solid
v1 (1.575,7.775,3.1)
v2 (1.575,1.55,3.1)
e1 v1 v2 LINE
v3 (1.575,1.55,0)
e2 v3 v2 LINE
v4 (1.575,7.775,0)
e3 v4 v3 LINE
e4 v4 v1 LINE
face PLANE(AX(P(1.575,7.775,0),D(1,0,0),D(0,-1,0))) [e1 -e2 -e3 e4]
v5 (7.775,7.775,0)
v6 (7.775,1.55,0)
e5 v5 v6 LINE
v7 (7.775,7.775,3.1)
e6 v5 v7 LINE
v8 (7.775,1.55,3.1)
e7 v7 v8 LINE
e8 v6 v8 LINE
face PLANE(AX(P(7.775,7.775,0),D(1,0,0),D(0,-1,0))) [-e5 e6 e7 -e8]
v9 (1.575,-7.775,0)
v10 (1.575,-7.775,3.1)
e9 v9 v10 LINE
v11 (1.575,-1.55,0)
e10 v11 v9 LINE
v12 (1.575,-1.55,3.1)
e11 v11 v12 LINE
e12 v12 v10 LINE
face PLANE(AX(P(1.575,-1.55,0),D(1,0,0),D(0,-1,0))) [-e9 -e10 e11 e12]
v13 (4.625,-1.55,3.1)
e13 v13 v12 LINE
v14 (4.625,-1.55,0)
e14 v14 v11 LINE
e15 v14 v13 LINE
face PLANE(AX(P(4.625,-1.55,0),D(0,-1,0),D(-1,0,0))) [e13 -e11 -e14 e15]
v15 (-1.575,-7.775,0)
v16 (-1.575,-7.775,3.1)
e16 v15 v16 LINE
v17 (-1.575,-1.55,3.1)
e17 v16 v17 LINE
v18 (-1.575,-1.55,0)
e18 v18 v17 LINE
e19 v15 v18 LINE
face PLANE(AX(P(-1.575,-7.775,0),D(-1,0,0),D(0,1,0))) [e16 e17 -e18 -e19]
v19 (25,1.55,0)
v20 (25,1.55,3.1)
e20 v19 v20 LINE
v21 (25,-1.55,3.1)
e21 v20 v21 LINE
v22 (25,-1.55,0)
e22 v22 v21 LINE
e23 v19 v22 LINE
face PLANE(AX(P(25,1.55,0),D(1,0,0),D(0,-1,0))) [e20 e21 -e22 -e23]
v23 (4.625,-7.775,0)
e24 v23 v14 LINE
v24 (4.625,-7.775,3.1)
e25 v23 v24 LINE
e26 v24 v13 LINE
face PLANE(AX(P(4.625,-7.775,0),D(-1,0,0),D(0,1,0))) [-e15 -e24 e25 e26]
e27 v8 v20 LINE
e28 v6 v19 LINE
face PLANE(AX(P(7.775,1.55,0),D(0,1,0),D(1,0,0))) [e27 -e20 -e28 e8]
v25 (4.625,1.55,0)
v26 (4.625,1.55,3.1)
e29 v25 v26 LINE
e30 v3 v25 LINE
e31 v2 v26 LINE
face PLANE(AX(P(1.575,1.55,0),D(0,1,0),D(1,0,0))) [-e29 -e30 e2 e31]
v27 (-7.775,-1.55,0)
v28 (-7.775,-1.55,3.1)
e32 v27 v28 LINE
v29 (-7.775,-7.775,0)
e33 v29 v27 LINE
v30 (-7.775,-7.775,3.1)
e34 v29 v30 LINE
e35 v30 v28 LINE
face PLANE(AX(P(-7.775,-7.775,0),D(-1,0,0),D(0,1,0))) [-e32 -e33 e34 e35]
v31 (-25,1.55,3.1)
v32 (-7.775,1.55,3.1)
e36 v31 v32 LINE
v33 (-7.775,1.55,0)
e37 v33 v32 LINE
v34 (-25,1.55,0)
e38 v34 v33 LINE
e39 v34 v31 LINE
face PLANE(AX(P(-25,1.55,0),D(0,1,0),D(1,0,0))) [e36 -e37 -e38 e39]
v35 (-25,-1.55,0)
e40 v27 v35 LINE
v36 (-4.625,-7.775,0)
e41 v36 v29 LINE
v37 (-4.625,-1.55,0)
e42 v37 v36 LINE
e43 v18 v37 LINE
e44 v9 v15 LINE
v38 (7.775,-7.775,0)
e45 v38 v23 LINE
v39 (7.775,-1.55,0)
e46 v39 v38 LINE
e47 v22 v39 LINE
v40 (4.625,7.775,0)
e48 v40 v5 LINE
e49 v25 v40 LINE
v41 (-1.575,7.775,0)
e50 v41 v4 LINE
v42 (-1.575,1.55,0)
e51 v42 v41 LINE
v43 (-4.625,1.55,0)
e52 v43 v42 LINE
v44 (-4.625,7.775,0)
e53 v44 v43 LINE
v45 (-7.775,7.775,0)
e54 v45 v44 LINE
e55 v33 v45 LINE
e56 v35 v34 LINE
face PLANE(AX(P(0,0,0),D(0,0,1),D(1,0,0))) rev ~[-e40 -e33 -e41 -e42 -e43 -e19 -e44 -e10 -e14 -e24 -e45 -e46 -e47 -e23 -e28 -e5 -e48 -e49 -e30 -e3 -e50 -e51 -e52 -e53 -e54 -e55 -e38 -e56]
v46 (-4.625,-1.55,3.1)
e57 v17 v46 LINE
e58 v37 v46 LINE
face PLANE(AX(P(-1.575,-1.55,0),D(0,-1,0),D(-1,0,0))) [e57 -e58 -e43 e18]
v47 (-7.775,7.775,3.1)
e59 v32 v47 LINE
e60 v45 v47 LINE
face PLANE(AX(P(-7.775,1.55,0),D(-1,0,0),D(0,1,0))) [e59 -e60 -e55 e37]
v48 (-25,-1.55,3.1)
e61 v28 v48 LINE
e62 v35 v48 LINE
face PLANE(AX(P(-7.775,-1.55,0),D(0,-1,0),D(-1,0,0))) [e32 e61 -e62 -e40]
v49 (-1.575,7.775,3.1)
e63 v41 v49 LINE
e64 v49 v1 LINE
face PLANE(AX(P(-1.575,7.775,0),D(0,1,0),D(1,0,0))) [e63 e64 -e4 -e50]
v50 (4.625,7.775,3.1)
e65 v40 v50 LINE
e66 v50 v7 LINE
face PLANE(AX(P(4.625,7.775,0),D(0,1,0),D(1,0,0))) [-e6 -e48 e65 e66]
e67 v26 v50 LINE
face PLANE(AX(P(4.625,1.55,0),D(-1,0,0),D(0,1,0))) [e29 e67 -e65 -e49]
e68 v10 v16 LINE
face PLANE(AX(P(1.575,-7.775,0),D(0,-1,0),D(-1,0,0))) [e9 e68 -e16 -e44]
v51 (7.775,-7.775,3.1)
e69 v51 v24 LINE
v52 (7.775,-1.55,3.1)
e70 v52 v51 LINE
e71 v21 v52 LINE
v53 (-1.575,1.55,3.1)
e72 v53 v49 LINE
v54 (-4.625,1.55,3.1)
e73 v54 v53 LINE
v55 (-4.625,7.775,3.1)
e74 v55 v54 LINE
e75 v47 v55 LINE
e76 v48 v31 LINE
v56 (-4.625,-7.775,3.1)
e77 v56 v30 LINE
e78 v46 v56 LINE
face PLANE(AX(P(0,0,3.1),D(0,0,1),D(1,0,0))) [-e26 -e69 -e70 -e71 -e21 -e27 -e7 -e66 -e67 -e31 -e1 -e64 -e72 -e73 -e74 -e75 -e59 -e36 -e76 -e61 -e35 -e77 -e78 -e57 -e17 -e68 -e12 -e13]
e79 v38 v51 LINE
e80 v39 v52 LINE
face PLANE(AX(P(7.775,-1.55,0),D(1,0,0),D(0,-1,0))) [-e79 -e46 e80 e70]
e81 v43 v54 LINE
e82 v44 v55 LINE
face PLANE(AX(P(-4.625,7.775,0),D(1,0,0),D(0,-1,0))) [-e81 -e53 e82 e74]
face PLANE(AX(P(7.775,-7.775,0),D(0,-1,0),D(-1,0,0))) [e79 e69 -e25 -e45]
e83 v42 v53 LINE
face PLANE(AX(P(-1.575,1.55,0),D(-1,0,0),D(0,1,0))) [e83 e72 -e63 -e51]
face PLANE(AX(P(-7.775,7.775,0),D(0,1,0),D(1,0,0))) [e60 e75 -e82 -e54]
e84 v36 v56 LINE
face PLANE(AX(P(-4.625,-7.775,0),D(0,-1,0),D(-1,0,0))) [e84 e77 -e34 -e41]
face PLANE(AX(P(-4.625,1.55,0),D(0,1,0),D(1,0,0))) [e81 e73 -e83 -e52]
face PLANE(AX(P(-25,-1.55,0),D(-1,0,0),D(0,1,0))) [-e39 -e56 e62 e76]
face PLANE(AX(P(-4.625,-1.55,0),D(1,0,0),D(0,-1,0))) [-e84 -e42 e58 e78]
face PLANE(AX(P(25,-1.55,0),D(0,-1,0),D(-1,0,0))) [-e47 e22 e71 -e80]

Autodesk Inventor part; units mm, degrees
ref_plane "YZ Plane" through (0, 0, 0) normal (1, 0, 0) x (0, 1, 0)
ref_plane "XZ Plane" through (0, 0, 0) normal (0, 1, 0) x (-1, 0, 0)
ref_plane "XY Plane" through (0, 0, 0) normal (0, 0, 1) x (1, 0, 0)
sketch "tabs" plane through (0, 0, 0) normal (0, 0, 1) x (1, 0, 0)
  line L0 (15.6175, 17.0118) -> (18.7675, 17.0118)
  line L1 (18.7675, 17.0118) -> (18.7675, 10.7868)
  line L2 (18.7675, 10.7868) -> (15.6175, 10.7868)
  line L3 (15.6175, 10.7868) -> (15.6175, 17.0118)
  line L4 (21.8175, 17.0118) -> (24.9675, 17.0118)
  line L5 (24.9675, 17.0118) -> (24.9675, 10.7868)
  line L6 (24.9675, 10.7868) -> (21.8175, 10.7868)
  line L7 (21.8175, 10.7868) -> (21.8175, 17.0118)
  line L8 (28.0175, 17.0118) -> (31.1675, 17.0118)
  line L9 (31.1675, 17.0118) -> (31.1675, 10.7868)
  line L10 (31.1675, 10.7868) -> (28.0175, 10.7868)
  line L11 (28.0175, 10.7868) -> (28.0175, 17.0118)
  line L12 (23.3925, 10.7868) -> (23.3925, 8.8536) construction
  point P0 (23.3925, 12.1901)
  dimension "d2" = 3.15
  dimension "d3" = 3.05
  dimension "d4" = 3.05
  dimension "d5" = 6.225
sketch "Sketch1" plane through (0, 0, 0) normal (0, 0, 1) x (1, 0, 0)
  line L0 (-25, 1.55) -> (25, 1.55)
  line L1 (25, 1.55) -> (25, -1.55)
  line L2 (25, -1.55) -> (-25, -1.55)
  line L3 (-25, -1.55) -> (-25, 1.55)
  line L4 (0, 16.9043) -> (0, -20.0235) construction
  line L5 (-32.3473, 0) -> (40.4078, 0) construction
  line L6 (-7.775, 7.775) -> (-4.625, 7.775)
  line L7 (-4.625, 7.775) -> (-4.625, 1.55)
  line L8 (-4.625, 1.55) -> (-7.775, 1.55)
  line L9 (-7.775, 1.55) -> (-7.775, 7.775)
  line L10 (-1.575, 7.775) -> (1.575, 7.775)
  line L11 (1.575, 7.775) -> (1.575, 1.55)
  line L12 (1.575, 1.55) -> (-1.575, 1.55)
  line L13 (-1.575, 1.55) -> (-1.575, 7.775)
  line L14 (4.625, 7.775) -> (7.775, 7.775)
  line L15 (7.775, 7.775) -> (7.775, 1.55)
  line L16 (7.775, 1.55) -> (4.625, 1.55)
  line L17 (4.625, 1.55) -> (4.625, 7.775)
  line L18 (0, 1.55) -> (0, -0.3832) construction
  line L19 (-7.775, -1.55) -> (-4.625, -1.55)
  line L20 (-4.625, -1.55) -> (-4.625, -7.775)
  line L21 (-4.625, -7.775) -> (-7.775, -7.775)
  line L22 (-7.775, -7.775) -> (-7.775, -1.55)
  line L23 (-1.575, -1.55) -> (1.575, -1.55)
  line L24 (1.575, -1.55) -> (1.575, -7.775)
  line L25 (1.575, -7.775) -> (-1.575, -7.775)
  line L26 (-1.575, -7.775) -> (-1.575, -1.55)
  line L27 (4.625, -1.55) -> (7.775, -1.55)
  line L28 (7.775, -1.55) -> (7.775, -7.775)
  line L29 (7.775, -7.775) -> (4.625, -7.775)
  line L30 (4.625, -7.775) -> (4.625, -1.55)
  line L31 (0, -7.775) -> (0, -9.7082) construction
  point P0 (0, 0)
  point P1 (25, 0)
  dimension "d0" = 50
  dimension "d1" = 3.1
extrude "Extrusion1" add sketch "Sketch1" along normal blind 3.1
equation "\"d2\" = mat + kerf"
equation "\"d3\" = mat - kerf"
equation "\"d4\" = mat - kerf"
equation "\"d5\" = 2 * mat + 0.5 * kerf"
equation "\"d1\" = mat"
equation "\"d6\" = mat"
equation "\"mat\" = 3.1"
equation "\"kerf\" = 0.05"
properties part number "link1"
